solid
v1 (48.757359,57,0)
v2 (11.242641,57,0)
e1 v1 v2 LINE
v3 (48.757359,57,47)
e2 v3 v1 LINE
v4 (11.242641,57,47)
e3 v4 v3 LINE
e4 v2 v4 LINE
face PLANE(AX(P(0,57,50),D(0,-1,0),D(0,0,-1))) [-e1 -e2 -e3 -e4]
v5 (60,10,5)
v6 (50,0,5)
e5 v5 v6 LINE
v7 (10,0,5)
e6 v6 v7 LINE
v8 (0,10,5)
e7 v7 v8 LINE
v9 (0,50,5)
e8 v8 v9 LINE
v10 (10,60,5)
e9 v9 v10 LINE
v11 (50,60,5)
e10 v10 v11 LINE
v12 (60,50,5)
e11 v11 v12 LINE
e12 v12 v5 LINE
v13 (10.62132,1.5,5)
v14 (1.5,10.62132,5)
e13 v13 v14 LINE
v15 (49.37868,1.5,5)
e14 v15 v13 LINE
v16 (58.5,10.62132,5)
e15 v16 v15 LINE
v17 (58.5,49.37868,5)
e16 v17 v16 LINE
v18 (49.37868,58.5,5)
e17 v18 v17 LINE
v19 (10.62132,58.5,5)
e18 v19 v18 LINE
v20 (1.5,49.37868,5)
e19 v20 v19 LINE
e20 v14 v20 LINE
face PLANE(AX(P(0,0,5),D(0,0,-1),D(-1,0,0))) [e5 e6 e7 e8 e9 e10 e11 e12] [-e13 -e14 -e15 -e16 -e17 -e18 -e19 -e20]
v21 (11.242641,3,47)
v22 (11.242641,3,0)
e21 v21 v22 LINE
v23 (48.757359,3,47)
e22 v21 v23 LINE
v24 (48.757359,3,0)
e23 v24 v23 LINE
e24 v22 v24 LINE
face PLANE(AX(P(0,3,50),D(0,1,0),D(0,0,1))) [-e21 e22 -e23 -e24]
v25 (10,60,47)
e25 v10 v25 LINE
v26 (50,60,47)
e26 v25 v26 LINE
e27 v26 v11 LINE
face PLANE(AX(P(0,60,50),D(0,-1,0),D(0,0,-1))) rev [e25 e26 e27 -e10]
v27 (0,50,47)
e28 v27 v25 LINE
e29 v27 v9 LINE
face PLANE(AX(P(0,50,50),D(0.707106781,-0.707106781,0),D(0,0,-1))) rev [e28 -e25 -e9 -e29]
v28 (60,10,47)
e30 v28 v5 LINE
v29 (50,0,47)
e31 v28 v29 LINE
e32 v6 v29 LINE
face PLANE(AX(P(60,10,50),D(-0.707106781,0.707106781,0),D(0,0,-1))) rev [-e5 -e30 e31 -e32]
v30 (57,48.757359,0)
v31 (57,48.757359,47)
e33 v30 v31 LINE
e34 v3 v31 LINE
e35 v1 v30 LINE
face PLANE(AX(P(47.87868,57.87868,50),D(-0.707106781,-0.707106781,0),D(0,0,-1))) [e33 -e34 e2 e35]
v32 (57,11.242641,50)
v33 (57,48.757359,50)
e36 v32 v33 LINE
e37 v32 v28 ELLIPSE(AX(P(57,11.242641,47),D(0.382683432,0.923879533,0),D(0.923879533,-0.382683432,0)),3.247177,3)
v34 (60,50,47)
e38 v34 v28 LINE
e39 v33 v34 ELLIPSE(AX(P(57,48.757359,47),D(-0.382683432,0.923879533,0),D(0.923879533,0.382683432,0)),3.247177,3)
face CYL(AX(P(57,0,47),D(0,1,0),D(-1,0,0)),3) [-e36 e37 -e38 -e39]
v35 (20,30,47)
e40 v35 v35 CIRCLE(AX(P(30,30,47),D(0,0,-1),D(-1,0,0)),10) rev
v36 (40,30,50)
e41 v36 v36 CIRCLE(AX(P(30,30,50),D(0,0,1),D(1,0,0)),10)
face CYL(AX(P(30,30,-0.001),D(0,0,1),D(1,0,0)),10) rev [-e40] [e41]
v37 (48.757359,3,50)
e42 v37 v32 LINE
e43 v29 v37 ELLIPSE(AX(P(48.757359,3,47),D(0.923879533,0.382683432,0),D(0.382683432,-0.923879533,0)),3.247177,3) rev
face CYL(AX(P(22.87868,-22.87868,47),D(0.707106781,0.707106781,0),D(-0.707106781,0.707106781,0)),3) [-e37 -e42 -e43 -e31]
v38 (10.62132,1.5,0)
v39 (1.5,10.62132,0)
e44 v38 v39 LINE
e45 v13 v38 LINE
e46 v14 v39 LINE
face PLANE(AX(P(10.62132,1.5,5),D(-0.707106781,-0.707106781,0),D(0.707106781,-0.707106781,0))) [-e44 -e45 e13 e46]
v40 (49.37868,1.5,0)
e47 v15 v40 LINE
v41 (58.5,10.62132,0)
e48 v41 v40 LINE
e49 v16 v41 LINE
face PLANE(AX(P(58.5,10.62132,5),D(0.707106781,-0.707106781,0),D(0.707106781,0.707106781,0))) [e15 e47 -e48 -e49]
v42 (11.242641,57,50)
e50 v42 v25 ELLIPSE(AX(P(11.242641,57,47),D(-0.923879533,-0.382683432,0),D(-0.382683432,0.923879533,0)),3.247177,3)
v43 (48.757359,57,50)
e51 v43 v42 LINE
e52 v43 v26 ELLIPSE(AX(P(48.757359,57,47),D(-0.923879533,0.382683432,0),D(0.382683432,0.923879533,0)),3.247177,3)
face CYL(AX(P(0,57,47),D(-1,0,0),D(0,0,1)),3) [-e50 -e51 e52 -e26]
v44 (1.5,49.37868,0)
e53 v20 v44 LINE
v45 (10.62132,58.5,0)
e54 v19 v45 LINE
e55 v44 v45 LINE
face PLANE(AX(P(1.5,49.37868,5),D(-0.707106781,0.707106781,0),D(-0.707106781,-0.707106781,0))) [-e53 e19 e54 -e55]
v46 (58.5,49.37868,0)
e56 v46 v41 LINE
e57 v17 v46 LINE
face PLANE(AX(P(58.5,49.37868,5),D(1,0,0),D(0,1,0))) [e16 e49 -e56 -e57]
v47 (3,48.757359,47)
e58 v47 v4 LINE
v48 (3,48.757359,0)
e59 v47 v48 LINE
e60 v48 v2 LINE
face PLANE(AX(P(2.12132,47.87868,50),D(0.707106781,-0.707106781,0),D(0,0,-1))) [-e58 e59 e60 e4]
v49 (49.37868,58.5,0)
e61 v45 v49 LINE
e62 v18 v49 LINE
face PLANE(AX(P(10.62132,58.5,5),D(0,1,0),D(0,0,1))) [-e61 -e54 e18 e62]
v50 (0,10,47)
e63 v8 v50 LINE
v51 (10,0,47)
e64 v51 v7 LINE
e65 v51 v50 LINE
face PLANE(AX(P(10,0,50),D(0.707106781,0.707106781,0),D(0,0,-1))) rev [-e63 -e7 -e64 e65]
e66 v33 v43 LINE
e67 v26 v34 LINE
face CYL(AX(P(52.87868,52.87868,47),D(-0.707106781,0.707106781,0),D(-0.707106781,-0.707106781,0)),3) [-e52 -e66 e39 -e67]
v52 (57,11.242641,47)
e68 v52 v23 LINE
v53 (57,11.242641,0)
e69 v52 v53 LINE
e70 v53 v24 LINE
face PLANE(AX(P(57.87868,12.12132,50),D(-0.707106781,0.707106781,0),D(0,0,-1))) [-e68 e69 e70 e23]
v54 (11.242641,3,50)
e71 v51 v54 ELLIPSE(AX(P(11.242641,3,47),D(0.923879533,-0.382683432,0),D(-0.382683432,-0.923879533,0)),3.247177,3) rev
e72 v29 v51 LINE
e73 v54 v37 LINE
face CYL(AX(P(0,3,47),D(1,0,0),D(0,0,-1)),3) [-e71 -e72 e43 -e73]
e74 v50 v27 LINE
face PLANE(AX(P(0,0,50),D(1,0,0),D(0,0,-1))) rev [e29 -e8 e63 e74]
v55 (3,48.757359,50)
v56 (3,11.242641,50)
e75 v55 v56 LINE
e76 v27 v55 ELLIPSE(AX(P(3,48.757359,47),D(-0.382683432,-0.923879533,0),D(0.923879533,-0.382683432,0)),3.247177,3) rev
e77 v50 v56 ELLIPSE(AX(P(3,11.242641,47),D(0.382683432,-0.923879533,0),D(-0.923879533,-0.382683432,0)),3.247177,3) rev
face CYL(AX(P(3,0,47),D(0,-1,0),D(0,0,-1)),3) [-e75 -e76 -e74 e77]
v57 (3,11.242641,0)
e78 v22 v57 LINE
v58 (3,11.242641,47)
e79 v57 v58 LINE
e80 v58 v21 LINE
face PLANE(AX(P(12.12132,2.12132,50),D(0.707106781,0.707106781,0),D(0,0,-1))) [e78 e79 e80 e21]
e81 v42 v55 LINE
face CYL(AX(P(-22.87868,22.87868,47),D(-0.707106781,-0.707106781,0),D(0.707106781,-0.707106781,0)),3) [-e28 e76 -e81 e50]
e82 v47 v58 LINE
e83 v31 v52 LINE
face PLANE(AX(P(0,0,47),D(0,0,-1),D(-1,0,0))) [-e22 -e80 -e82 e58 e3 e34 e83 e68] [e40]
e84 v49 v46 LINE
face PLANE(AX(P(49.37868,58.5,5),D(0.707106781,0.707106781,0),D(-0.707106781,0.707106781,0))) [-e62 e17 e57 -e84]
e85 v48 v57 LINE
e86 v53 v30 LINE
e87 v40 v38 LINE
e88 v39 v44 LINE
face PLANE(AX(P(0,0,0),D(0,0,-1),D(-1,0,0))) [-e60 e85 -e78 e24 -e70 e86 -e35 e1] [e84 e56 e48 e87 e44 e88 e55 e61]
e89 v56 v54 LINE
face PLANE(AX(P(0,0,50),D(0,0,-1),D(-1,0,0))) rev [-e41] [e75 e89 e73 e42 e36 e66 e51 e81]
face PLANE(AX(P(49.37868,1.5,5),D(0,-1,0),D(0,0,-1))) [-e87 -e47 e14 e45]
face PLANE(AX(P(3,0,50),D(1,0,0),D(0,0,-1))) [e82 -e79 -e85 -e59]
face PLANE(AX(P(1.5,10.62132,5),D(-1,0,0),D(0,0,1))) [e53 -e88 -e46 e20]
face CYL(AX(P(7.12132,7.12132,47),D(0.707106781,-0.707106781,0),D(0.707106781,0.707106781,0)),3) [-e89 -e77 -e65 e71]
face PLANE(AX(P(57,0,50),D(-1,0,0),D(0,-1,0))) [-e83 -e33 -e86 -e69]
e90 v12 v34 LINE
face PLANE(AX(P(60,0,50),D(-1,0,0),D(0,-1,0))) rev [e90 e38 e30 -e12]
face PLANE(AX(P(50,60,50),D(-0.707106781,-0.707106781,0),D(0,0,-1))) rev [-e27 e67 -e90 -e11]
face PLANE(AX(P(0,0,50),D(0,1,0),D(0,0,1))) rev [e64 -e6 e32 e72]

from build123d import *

# Parameters (mm, degrees)
SKETCH1_W           = 60
SKETCH1_H           = 60
BOSS_EXTRUDE1_DEPTH = 50
CHAMFER1_SIZE       = 10
FILLET1_R           = 3
SHELL2_DEPTH        = 47
CUT_EXTRUDE1_REACH  = 100.489
SKETCH2_R           = 10
CUT_EXTRUDE2_DEPTH  = 5


# Read off the part's stored shape, not the designer's step: Shell2
with BuildPart() as part:
    # Sketch1 → Boss-Extrude1 (new body)
    with BuildSketch(Plane.XY):
        with Locations((30, 30)):
            Rectangle(SKETCH1_W, SKETCH1_H)
    extrude(amount=BOSS_EXTRUDE1_DEPTH)

    # Chamfer1
    chamfer1_edges = [part.edges().sort_by_distance(p)[0] for p in [
        (0, 60, 25),
        (60, 60, 25),
        (60, 0, 25),
        (0, 0, 25),
    ]]
    chamfer(chamfer1_edges, length=CHAMFER1_SIZE)

    # Fillet1
    fillet1_edges = [part.edges().sort_by_distance(p)[0] for p in [
        (0, 30, 50),
        (30, 60, 50),
        (30, 0, 50),
        (60, 30, 50),
        (55, 55, 50),
        (55, 5, 50),
        (5, 5, 50),
        (5, 55, 50),
    ]]
    fillet(fillet1_edges, radius=FILLET1_R)

    # Shell2 outline → Shell2 (cut)
    with BuildSketch(Plane.XY):
        Polygon((3, 48.757359313), (3, 11.242640687), (11.242640687, 3), (48.757359313, 3), (57, 11.242640687), (57, 48.757359313), (48.757359313, 57), (11.242640687, 57), align=None)
    extrude(amount=SHELL2_DEPTH, mode=Mode.SUBTRACT)

    # Sketch2 → Cut-Extrude1 (cut, up to next)
    with BuildSketch(Plane.XY.offset(50), mode=Mode.PRIVATE) as cut_extrude1_sk1:
        with Locations((30, 30)):
            Circle(SKETCH2_R)
    cut_extrude1_tool1 = extrude(cut_extrude1_sk1.sketch, amount=-CUT_EXTRUDE1_REACH, mode=Mode.PRIVATE) & part.part
    add(cut_extrude1_tool1.solids().sort_by_distance((30, 30, 50))[0], mode=Mode.SUBTRACT)

    # Sketch3 → Cut-Extrude2 (cut)
    with BuildSketch(Plane(origin=(0, 0, 0), x_dir=(-1, 0, 0), z_dir=(0, 0, -1))):
        Polygon((0, 10), (0, 50), (-10, 60), (-50, 60), (-60, 50), (-60, 10), (-50, 0), (-10, 0), align=None)
        Polygon((-1.5, 10.621320344), (-1.5, 49.378679656), (-10.621320344, 58.5), (-49.378679656, 58.5), (-58.5, 49.378679656), (-58.5, 10.621320344), (-49.378679656, 1.5), (-10.621320344, 1.5), align=None, mode=Mode.SUBTRACT)
    extrude(amount=-CUT_EXTRUDE2_DEPTH, mode=Mode.SUBTRACT)


solid = part.part
